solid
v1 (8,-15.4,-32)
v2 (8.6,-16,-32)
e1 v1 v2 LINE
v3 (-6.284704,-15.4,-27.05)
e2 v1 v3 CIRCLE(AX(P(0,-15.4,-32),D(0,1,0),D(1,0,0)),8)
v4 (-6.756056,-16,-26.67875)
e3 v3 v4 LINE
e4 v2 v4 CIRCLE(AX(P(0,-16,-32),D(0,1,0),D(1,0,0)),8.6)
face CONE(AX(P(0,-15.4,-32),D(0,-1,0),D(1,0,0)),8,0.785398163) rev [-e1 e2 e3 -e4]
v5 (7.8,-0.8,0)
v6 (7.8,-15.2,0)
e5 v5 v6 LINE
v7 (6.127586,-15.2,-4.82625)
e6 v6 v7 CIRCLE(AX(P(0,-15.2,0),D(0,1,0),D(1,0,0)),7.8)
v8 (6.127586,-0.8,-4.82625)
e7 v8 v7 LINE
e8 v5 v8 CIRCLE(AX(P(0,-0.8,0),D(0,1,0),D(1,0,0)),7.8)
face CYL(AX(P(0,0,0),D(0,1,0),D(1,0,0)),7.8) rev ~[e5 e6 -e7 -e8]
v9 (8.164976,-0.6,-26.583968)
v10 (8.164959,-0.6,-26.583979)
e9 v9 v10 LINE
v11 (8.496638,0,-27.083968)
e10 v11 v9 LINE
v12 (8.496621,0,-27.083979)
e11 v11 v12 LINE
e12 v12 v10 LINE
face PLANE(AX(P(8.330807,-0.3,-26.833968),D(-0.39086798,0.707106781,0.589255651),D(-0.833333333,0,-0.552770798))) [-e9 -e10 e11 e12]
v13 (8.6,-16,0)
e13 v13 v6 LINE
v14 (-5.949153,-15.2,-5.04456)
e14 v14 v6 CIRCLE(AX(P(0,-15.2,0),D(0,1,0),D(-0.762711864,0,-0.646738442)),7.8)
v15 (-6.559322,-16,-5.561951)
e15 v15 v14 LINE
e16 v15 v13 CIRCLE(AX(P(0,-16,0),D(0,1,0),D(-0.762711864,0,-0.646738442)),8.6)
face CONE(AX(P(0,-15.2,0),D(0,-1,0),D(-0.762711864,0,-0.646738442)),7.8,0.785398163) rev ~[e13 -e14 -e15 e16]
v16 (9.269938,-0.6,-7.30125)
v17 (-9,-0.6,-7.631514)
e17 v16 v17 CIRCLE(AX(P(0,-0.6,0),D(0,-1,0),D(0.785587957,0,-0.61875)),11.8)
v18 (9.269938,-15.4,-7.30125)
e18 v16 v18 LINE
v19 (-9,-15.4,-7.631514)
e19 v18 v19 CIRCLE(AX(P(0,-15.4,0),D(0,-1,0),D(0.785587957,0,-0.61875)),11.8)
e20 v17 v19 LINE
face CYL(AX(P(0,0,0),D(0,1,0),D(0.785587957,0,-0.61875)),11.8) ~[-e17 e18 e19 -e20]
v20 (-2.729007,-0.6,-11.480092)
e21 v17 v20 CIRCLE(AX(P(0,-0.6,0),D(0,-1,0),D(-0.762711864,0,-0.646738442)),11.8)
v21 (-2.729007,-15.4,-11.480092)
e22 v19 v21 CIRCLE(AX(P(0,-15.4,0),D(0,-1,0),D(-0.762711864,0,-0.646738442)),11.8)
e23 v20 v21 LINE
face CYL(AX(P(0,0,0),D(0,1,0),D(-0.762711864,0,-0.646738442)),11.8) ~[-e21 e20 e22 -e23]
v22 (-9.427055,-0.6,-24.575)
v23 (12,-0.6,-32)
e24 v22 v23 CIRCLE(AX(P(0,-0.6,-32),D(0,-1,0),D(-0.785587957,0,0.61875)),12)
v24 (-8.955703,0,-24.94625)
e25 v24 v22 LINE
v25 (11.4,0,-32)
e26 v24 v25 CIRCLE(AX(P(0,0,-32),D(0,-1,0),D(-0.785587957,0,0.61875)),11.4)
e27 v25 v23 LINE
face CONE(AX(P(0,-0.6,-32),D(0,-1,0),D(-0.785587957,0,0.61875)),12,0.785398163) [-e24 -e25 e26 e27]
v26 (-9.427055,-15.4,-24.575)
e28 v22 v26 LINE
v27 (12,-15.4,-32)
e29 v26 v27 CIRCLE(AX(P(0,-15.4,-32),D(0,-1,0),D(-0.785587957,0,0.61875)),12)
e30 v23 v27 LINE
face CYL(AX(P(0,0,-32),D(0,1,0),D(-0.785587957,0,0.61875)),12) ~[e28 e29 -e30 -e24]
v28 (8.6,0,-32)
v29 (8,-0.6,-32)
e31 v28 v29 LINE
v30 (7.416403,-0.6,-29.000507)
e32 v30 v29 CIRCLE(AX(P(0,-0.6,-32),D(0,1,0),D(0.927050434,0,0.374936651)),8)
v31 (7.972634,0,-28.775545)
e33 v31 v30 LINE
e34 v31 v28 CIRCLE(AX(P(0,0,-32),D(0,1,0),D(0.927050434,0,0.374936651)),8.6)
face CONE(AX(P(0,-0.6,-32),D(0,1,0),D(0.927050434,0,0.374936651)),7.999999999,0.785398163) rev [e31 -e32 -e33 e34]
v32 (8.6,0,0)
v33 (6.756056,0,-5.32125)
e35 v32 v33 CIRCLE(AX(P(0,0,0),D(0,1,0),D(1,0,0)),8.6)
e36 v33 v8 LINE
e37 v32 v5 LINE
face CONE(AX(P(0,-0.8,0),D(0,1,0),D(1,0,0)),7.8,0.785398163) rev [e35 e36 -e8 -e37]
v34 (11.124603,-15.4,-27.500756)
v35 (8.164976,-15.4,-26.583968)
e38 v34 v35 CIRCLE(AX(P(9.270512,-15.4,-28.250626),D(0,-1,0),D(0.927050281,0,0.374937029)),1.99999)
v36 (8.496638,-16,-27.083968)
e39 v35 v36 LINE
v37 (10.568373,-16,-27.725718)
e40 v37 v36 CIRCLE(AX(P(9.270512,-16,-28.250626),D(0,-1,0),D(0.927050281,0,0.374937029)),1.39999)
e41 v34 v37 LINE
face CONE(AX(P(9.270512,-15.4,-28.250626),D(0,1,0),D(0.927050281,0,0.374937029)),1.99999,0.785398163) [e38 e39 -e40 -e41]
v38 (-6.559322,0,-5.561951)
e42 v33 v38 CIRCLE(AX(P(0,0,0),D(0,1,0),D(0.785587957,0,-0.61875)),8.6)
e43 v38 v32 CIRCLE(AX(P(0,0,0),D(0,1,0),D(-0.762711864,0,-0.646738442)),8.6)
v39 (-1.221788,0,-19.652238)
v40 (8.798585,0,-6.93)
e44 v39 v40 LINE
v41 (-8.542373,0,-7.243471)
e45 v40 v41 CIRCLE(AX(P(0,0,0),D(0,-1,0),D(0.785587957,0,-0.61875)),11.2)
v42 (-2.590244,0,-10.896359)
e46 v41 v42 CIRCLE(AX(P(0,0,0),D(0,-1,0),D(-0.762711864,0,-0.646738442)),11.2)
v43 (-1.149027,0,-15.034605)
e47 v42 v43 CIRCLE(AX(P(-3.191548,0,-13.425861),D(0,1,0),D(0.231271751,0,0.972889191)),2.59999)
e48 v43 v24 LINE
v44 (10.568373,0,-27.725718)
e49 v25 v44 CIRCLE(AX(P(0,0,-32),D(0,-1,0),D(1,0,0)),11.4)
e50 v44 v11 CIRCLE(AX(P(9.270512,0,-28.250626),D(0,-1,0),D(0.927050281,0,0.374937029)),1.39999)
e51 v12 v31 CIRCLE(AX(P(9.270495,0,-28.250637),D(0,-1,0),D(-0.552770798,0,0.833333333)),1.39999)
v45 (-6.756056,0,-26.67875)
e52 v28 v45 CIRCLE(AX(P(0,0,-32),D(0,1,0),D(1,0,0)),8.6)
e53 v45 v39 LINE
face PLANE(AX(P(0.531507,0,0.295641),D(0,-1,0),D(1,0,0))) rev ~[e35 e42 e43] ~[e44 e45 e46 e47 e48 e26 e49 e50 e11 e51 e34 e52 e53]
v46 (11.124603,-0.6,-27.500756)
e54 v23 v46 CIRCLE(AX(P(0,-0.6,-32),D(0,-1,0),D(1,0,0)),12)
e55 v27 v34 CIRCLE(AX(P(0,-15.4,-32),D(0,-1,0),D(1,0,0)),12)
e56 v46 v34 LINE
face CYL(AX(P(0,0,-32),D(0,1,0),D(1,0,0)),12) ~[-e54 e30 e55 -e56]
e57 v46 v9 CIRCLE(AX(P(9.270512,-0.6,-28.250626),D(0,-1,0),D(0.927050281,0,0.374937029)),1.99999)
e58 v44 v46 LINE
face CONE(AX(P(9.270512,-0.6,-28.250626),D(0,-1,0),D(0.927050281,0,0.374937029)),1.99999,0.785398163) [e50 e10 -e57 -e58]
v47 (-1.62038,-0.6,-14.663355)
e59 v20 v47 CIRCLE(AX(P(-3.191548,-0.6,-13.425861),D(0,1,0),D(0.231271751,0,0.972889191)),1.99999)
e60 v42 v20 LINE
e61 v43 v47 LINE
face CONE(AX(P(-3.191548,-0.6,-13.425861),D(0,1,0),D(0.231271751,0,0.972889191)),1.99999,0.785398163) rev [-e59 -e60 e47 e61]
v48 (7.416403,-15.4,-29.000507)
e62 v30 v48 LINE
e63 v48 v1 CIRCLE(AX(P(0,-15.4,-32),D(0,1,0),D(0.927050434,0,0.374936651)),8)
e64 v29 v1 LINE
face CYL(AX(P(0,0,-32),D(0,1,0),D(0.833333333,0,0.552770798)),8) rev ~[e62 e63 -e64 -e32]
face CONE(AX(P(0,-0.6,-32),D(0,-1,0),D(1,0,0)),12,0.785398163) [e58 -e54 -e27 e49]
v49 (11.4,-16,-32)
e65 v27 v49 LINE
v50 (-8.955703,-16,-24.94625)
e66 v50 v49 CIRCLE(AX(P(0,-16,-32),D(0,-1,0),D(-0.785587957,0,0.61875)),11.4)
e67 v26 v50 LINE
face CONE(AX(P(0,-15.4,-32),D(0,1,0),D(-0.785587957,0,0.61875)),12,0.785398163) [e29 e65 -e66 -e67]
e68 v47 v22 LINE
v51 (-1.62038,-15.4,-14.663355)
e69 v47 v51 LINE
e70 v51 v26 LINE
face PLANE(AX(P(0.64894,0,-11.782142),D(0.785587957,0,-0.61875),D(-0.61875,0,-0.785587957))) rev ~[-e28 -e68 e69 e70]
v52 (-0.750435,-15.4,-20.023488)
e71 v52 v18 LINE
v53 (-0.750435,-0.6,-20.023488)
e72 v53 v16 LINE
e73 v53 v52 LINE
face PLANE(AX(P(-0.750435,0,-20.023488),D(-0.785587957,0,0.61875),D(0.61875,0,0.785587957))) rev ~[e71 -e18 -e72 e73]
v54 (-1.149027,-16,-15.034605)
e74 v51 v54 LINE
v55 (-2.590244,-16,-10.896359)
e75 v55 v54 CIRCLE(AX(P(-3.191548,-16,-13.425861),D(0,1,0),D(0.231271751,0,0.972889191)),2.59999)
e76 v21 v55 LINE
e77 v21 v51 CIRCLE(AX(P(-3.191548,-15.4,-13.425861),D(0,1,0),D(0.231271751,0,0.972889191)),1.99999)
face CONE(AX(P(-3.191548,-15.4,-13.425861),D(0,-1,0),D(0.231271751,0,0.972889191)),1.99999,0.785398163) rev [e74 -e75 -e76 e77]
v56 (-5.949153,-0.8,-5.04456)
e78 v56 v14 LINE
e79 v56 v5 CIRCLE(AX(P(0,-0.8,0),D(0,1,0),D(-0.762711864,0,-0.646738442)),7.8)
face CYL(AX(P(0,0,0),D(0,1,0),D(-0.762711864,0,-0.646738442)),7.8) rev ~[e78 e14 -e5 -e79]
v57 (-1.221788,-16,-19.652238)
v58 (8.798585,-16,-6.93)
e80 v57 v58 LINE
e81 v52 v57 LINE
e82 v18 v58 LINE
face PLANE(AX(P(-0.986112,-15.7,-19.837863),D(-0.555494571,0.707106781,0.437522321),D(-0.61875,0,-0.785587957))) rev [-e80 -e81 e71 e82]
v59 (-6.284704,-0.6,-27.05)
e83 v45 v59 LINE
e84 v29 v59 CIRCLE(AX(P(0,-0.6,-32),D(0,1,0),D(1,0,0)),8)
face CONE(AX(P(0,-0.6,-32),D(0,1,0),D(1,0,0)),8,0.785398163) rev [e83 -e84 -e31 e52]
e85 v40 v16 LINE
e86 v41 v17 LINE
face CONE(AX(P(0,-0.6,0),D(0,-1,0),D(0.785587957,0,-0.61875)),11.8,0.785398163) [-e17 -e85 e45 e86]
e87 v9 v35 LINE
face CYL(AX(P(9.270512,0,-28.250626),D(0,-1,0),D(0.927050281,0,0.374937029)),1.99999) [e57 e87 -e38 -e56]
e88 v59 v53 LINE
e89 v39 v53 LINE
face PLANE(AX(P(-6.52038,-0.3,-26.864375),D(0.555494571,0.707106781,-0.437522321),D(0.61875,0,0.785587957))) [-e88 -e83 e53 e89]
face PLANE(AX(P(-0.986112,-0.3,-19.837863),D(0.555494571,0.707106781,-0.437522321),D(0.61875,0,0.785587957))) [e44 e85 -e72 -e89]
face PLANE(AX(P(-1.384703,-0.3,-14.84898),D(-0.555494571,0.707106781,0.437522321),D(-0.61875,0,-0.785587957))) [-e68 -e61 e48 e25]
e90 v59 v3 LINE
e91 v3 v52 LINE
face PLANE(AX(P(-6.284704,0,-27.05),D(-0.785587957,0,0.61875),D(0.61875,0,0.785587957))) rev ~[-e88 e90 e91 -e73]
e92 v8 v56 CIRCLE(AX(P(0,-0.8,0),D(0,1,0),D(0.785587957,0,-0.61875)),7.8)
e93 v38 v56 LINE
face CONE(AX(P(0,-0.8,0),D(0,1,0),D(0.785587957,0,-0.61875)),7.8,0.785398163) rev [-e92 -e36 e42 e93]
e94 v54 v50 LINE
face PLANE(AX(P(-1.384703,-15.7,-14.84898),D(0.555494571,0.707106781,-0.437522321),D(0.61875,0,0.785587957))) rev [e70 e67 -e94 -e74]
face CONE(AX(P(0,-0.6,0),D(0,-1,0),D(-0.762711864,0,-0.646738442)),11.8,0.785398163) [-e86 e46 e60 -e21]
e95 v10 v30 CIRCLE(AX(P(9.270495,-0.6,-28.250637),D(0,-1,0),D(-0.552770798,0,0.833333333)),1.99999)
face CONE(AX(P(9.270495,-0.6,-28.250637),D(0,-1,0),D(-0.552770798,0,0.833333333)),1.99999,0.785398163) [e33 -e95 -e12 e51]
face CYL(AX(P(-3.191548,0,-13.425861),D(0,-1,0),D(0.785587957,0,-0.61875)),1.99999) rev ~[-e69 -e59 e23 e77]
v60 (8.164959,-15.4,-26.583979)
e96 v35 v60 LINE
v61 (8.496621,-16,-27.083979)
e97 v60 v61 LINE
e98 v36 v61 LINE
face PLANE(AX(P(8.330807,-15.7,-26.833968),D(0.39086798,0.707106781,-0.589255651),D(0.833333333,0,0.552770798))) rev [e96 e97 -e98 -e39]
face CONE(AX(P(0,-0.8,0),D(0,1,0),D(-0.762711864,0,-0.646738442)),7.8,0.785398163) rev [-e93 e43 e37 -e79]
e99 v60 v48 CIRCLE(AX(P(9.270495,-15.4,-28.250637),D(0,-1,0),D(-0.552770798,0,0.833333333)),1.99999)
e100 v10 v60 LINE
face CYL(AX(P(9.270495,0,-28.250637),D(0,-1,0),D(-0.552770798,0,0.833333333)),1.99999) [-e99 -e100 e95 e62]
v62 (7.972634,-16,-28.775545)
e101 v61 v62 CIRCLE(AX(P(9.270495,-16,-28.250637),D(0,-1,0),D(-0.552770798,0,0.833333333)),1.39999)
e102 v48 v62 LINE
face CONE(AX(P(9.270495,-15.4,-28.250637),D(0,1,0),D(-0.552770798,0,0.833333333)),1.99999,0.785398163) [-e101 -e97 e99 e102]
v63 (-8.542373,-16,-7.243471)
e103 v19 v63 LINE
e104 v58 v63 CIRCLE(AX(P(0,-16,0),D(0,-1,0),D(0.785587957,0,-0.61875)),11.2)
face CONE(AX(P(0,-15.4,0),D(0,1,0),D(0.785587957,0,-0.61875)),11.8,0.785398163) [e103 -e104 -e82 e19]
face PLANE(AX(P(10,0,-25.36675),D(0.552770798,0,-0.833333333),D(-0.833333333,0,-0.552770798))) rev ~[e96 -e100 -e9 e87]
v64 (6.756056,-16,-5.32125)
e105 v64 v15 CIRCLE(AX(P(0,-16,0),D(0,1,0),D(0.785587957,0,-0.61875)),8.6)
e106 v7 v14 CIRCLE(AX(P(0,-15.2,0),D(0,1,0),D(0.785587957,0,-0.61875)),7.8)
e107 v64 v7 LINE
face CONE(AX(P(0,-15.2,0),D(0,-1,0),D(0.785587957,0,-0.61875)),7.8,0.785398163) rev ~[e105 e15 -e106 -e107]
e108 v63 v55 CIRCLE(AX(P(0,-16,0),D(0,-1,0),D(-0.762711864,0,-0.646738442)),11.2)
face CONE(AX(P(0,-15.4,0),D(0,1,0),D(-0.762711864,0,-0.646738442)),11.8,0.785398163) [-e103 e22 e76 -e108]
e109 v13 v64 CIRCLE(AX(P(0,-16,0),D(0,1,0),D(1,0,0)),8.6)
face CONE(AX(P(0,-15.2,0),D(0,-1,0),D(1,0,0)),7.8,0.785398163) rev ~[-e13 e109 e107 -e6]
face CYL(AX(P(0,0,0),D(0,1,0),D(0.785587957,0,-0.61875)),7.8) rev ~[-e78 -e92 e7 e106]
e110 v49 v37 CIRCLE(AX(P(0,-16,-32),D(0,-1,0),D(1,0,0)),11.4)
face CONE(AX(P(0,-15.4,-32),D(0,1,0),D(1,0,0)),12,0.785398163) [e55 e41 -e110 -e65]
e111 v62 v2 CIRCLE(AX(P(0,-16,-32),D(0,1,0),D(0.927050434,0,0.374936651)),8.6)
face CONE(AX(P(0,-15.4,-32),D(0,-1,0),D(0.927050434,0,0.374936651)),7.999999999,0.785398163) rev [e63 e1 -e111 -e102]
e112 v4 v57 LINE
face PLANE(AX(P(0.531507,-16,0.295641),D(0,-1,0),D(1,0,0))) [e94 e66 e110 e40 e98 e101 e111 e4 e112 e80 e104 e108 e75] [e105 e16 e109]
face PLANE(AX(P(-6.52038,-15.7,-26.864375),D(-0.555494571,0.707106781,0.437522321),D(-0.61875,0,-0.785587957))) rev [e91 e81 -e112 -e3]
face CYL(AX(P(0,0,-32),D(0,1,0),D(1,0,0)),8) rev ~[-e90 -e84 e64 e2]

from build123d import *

# Parameters (mm, degrees)
F1_DEPTH = 16
F2_R     = 1.99999
F3_SIZE  = 0.8
F4_SIZE  = 0.6


# Not quite as in the source:
# - a fillet or chamfer is up to 0.001 mm smaller than in the source, because OpenCascade refuses the exact size


with BuildPart() as f1:
    # F0 (on Front) → F1 (new body)
    with BuildSketch(Plane.XZ):
        with BuildLine():
            ThreePointArc((7.8, 0), (7.3700465154, -2.5539017916), (6.1275860612, -4.82625))
            Line((6.1275860612, -4.82625), (0.648940015, -11.7821422864))
            ThreePointArc((0.648940015, -11.7821422864), (5.4420247731, -10.4701655368), (9.2699378875, -7.30125))
            ThreePointArc((9.2699378875, -7.30125), (11.1495575489, -3.8635950181), (11.8, 0))
            ThreePointArc((11.8, 0), (-4.0644802866, 11.0779059393), (-9, -7.6315136113))
            Line((-9, -7.6315136113), (-5.9491525424, -5.0445598448))
            ThreePointArc((-5.9491525424, -5.0445598448), (-2.6866903589, 7.322683587), (7.8, 0))
        make_face()
        with BuildLine():
            ThreePointArc((9.2699378875, -7.30125), (5.4420247731, -10.4701655368), (0.648940015, -11.7821422864))
            Line((0.648940015, -11.7821422864), (-9.4270554788, -24.575))
            ThreePointArc((-9.4270554788, -24.575), (-5.5744413376, -21.3733540676), (-0.7504354082, -20.0234877073))
            Line((-0.7504354082, -20.0234877073), (9.2699378875, -7.30125))
        make_face()
        with BuildLine():
            ThreePointArc((-0.7504354082, -20.0234877073), (-5.5744413376, -21.3733540676), (-9.4270554788, -24.575))
            ThreePointArc((-9.4270554788, -24.575), (-3.9290796794, -43.3385331006), (12, -32))
            ThreePointArc((12, -32), (11.4891252931, -28.5358983849), (10, -25.3667504193))
            Line((10, -25.3667504193), (6.6666666667, -27.5778336129))
            ThreePointArc((6.6666666667, -27.5778336129), (7.6594168621, -29.6905989232), (8, -32))
            ThreePointArc((8, -32), (-2.619386453, -39.559022067), (-6.2847036525, -27.05))
            Line((-6.2847036525, -27.05), (-0.7504354082, -20.0234877073))
        make_face()
        with BuildLine():
            Line((0.648940015, -11.7821422864), (6.1275860612, -4.82625))
            ThreePointArc((6.1275860612, -4.82625), (0.1409766904, -7.7987258942), (-5.9491525424, -5.0445598448))
            Line((-5.9491525424, -5.0445598448), (-9, -7.6315136113))
            ThreePointArc((-9, -7.6315136113), (-4.6628296471, -10.8396503487), (0.648940015, -11.7821422864))
        make_face()
    extrude(amount=F1_DEPTH)

    # F2 (radius 2 in the source; OpenCascade refuses exactly that, so slightly less here)
    f2_edges = [f1.edges().sort_by_distance(p)[0] for p in [
        (6.127586, -8, -4.82625),
        (9.269938, -8, -7.30125),
        (10, -8, -25.36675),
        (6.666667, -8, -27.577834),
        (0.64894, -8, -11.782142),
    ]]
    fillet(f2_edges, radius=F2_R)

    # F3
    f3_edges = [f1.edges().sort_by_distance(p)[0] for p in [
        (-6.127586, -16, 4.82625),
        (-6.127586, 0, 4.82625),
    ]]
    chamfer(f3_edges, length=F3_SIZE)

    # F4
    f4_edges = [f1.edges().sort_by_distance(p)[0] for p in [
        (-3.880931, -16, 11.143535),
        (1.492617, 0, -17.175625),
        (-5.523718, 0, -19.619177),
        (-1.302823, 0, -12.768079),
        (-1.69128, 0, -43.880218),
        (-3.880931, 0, 11.143535),
        (9.862297, 0, -26.340194),
        (8.164968, 0, -26.583973),
        (-1.127522, 0, -39.920145),
        (7.360063, 0, -27.658852),
        (-5.523718, -16, -19.619177),
        (-1.302823, -16, -12.768079),
        (-1.69128, -16, -43.880218),
        (9.862297, -16, -26.340194),
        (1.492617, -16, -17.175625),
        (8.164968, -16, -26.583973),
        (-1.127522, -16, -39.920145),
        (7.360063, -16, -27.658852),
    ]]
    chamfer(f4_edges, length=F4_SIZE)


solid = f1.part
